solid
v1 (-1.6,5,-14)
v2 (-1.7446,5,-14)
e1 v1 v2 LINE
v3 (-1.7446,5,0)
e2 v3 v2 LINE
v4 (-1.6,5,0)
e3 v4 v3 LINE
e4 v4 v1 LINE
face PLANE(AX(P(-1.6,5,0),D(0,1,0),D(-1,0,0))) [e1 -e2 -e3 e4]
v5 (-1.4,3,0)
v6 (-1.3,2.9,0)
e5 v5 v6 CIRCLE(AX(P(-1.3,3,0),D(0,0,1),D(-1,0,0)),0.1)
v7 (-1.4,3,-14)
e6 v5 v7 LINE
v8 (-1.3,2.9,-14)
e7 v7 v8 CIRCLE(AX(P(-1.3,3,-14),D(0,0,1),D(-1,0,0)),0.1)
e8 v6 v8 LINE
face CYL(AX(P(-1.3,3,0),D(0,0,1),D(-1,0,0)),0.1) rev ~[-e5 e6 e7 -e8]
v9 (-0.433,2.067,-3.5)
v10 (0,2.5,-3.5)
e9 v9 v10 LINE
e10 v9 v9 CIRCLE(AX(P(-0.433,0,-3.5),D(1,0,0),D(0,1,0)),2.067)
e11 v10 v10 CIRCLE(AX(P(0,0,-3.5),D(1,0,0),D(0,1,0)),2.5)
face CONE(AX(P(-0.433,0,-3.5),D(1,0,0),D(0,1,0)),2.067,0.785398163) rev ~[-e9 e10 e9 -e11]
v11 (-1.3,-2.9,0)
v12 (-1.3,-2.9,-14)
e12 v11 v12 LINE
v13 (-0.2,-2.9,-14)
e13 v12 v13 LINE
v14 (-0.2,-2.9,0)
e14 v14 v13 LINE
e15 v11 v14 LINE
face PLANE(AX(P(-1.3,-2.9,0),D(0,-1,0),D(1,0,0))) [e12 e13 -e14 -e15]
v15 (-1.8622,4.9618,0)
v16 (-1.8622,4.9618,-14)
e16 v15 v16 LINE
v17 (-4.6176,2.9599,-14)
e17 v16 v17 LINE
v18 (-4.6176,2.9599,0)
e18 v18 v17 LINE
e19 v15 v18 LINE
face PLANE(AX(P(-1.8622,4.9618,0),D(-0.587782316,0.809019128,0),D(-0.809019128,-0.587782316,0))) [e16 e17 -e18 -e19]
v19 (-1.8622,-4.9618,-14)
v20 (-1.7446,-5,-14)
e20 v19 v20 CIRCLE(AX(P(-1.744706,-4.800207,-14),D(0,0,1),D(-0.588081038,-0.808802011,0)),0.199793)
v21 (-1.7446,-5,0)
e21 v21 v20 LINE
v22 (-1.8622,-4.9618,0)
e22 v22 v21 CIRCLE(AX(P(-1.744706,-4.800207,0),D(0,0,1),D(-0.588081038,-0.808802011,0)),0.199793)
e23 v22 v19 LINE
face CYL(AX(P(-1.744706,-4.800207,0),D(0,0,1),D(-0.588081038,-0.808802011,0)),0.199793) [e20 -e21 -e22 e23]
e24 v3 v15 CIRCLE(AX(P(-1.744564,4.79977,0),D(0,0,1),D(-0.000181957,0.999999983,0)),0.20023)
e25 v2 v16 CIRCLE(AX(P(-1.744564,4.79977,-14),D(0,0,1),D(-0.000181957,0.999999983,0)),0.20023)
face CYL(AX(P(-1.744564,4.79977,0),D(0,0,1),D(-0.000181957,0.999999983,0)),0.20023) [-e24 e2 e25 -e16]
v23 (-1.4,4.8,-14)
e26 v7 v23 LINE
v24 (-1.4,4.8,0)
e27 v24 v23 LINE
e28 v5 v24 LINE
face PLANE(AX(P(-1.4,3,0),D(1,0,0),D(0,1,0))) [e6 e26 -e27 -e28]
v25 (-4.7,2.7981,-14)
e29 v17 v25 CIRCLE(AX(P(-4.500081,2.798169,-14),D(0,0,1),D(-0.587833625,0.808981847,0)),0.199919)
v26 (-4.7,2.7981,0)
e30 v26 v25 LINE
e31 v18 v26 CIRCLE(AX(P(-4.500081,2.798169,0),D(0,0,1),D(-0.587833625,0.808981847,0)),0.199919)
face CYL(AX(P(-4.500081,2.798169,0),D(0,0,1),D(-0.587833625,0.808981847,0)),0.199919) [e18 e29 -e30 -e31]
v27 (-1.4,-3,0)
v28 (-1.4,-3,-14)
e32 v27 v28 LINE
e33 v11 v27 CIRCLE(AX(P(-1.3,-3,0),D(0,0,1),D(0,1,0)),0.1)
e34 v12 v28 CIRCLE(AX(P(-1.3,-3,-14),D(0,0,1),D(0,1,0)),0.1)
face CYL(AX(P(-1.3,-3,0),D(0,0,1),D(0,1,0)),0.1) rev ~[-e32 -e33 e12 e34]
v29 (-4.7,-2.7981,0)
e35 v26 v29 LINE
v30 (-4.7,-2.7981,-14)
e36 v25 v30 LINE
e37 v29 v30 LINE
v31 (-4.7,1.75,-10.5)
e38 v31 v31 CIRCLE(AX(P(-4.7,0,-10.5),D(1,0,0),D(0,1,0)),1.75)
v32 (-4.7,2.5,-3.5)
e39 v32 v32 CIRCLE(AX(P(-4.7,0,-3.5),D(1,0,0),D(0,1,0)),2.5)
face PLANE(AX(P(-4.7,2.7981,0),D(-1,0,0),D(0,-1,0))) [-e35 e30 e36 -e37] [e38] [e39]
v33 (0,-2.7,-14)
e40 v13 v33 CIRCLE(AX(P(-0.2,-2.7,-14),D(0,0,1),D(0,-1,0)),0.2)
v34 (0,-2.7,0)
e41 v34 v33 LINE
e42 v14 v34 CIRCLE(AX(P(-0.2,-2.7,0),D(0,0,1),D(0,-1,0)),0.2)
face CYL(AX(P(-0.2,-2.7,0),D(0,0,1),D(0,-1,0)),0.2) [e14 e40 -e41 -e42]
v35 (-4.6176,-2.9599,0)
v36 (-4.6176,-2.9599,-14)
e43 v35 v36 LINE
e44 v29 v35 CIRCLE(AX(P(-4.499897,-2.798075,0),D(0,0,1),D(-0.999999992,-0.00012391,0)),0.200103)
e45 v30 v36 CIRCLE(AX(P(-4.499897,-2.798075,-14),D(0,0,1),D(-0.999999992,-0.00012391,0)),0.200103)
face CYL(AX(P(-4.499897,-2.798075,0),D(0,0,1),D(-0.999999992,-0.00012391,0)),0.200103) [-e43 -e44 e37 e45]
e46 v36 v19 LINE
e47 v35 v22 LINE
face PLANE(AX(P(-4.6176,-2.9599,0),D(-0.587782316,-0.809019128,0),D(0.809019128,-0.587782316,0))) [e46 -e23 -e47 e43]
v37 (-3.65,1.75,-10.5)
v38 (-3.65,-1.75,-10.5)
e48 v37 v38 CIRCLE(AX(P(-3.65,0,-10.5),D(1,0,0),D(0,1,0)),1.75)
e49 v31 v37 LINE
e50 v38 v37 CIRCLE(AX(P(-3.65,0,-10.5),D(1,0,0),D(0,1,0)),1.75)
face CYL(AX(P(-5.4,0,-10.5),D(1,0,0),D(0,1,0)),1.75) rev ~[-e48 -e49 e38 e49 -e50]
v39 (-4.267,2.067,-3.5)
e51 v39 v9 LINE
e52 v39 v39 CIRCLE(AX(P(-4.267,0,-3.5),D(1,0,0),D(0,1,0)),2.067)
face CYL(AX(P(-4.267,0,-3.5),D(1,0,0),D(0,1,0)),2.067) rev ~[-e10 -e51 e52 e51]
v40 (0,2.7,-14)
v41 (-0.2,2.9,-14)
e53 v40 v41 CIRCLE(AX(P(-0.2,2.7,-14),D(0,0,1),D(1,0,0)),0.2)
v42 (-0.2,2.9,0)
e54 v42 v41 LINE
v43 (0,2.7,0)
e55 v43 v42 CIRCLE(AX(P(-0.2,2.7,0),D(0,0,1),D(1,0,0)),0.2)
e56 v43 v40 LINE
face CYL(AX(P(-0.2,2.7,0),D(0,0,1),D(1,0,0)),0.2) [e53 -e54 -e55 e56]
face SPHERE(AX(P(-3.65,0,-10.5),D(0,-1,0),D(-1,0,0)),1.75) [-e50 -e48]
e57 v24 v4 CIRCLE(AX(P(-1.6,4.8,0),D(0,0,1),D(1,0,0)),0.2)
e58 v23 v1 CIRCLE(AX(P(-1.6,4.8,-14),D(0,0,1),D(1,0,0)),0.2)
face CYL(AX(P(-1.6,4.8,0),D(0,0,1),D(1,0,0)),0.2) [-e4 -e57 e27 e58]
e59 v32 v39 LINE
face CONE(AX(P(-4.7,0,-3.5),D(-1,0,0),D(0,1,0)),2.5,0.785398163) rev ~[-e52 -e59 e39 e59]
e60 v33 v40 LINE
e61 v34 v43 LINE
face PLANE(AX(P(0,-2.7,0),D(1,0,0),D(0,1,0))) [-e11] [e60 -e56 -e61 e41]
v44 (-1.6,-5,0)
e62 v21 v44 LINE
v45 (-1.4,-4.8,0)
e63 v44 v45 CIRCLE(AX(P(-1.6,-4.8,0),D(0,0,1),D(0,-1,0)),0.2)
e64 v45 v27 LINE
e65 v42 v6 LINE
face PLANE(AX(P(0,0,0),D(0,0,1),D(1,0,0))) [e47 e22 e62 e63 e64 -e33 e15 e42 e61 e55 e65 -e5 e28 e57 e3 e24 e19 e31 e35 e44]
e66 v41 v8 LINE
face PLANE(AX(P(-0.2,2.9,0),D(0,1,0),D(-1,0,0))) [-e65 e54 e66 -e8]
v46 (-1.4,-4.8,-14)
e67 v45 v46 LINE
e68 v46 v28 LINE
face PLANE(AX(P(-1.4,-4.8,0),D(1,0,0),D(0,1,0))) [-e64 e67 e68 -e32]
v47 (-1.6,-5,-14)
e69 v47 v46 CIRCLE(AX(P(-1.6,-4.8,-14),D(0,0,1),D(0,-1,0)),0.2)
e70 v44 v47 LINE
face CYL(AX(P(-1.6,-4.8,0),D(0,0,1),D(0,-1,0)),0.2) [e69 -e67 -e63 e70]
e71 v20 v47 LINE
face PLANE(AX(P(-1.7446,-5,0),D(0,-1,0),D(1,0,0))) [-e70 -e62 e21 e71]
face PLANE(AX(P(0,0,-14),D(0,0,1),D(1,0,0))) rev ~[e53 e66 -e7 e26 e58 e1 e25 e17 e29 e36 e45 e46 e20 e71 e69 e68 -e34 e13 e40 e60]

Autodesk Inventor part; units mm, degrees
sketch "_____1" plane through (0, 0, 0) normal (0, 0, 1) x (1, 0, 0)
  line L0 (-4.7, 2.7981) -> (-4.7, -2.7981)
  arc A0 (-4.7, -2.7981) -> (-4.6176, -2.9599) centre (-4.5, -2.7981) ccw
  line L1 (-4.6176, -2.9599) -> (-1.8622, -4.9618)
  arc A1 (-1.8622, -4.9618) -> (-1.7446, -5) centre (-1.7446, -4.8) ccw
  line L2 (-1.7446, -5) -> (-1.6, -5)
  arc A2 (-1.6, -5) -> (-1.4, -4.8) centre (-1.6, -4.8) ccw
  line L3 (-1.4, -4.8) -> (-1.4, -3)
  arc A3 (-1.3, -2.9) -> (-1.4, -3) centre (-1.3, -3) ccw
  line L4 (-1.3, -2.9) -> (-0.2, -2.9)
  arc A4 (-0.2, -2.9) -> (0, -2.7) centre (-0.2, -2.7) ccw
  line L5 (0, -2.7) -> (0, 2.7)
  arc A5 (0, 2.7) -> (-0.2, 2.9) centre (-0.2, 2.7) ccw
  line L6 (-0.2, 2.9) -> (-1.3, 2.9)
  arc A6 (-1.4, 3) -> (-1.3, 2.9) centre (-1.3, 3) ccw
  line L7 (-1.4, 3) -> (-1.4, 4.8)
  arc A7 (-1.4, 4.8) -> (-1.6, 5) centre (-1.6, 4.8) ccw
  line L8 (-1.6, 5) -> (-1.7446, 5)
  arc A8 (-1.7446, 5) -> (-1.8622, 4.9618) centre (-1.7446, 4.8) ccw
  line L9 (-1.8622, 4.9618) -> (-4.6176, 2.9599)
  arc A9 (-4.6176, 2.9599) -> (-4.7, 2.7981) centre (-4.5, 2.7981) ccw
extrude "Extrusion1" add sketch "_____1" against normal blind 14
sketch "_____2" plane through (0, 0, -3.5) normal (0, 0, 1) x (1, 0, 0)
  line L0 (0, 0) -> (-4.7, 0)
  line L1 (-4.7, 0) -> (-4.7, 2.5)
  line L2 (-4.7, 2.5) -> (-4.267, 2.067)
  line L3 (-4.267, 2.067) -> (-0.433, 2.067)
  line L4 (-0.433, 2.067) -> (0, 2.5)
  line L5 (0, 2.5) -> (0, 0)
  line L6 (0, 0) -> (-4.7, 0)
revolve "Revolution1" cut sketch "_____2" angle 360 about axis through (0, 0, -3.5) along (1, 0, 0)
thread "Thread1" size "M5x0.8" class "6H" standard "ISO Metric profile" full length
sketch "_____3" plane through (0, 0, -10.5) normal (0, 0, 1) x (1, 0, 0)
  line L0 (-3.65, 0) -> (-5.4, 0)
  line L1 (-5.4, 0) -> (-5.4, 1.75)
  line L2 (-5.4, 1.75) -> (-3.65, 1.75)
  line L3 (-3.65, 1.75) -> (-3.65, 0)
  line L4 (-3.65, 0) -> (-5.4, 0)
revolve "Revolution2" cut sketch "_____3" angle 360 about axis through (-3.65, 0, -10.5) along (1, 0, 0)
sketch "_____4" plane through (0, 0, -10.5) normal (0, 0, 1) x (1, 0, 0)
  line L0 (-3.65, 1.75) -> (-3.65, -1.75)
  arc A0 (-3.65, 1.75) -> (-3.65, -1.75) centre (-3.65, 0) ccw
  line L1 (-3.65, 1.75) -> (-3.65, -1.75)
revolve "Revolution3" add sketch "_____4" angle 360 about axis through (-3.65, 1.75, -10.5) along (0, 1, 0)
ref_plane "to_blackets_XY" through (0, 0, -3.5) normal (1, 0, 0) x (0, 0, -1)
ref_plane "to_blackets_YZ" through (0, 0, -3.5) normal (0, 0, -1) x (0, 1, 0)
ref_plane "to_blackets_ZX" through (0, 0, -3.5) normal (0, 1, 0) x (1, 0, 0)
ref_plane "to_bolt_XY" through (-4.7, 0, -3.5) normal (1, 0, 0) x (0, 0, -1)
ref_plane "to_bolt_YZ" through (-4.7, 0, -3.5) normal (0, 0, -1) x (0, 1, 0)
ref_plane "to_bolt_ZX" through (-4.7, 0, -3.5) normal (0, 1, 0) x (1, 0, 0)
ref_plane "to_frames_XY" through (-1.4, 0, -3.5) normal (1, 0, 0) x (0, 0, -1)
ref_plane "to_frames_YZ" through (-1.4, 0, -3.5) normal (0, 0, -1) x (0, 1, 0)
ref_plane "to_frames_ZX" through (-1.4, 0, -3.5) normal (0, 1, 0) x (1, 0, 0)
properties part number "SHNTU5-5"
